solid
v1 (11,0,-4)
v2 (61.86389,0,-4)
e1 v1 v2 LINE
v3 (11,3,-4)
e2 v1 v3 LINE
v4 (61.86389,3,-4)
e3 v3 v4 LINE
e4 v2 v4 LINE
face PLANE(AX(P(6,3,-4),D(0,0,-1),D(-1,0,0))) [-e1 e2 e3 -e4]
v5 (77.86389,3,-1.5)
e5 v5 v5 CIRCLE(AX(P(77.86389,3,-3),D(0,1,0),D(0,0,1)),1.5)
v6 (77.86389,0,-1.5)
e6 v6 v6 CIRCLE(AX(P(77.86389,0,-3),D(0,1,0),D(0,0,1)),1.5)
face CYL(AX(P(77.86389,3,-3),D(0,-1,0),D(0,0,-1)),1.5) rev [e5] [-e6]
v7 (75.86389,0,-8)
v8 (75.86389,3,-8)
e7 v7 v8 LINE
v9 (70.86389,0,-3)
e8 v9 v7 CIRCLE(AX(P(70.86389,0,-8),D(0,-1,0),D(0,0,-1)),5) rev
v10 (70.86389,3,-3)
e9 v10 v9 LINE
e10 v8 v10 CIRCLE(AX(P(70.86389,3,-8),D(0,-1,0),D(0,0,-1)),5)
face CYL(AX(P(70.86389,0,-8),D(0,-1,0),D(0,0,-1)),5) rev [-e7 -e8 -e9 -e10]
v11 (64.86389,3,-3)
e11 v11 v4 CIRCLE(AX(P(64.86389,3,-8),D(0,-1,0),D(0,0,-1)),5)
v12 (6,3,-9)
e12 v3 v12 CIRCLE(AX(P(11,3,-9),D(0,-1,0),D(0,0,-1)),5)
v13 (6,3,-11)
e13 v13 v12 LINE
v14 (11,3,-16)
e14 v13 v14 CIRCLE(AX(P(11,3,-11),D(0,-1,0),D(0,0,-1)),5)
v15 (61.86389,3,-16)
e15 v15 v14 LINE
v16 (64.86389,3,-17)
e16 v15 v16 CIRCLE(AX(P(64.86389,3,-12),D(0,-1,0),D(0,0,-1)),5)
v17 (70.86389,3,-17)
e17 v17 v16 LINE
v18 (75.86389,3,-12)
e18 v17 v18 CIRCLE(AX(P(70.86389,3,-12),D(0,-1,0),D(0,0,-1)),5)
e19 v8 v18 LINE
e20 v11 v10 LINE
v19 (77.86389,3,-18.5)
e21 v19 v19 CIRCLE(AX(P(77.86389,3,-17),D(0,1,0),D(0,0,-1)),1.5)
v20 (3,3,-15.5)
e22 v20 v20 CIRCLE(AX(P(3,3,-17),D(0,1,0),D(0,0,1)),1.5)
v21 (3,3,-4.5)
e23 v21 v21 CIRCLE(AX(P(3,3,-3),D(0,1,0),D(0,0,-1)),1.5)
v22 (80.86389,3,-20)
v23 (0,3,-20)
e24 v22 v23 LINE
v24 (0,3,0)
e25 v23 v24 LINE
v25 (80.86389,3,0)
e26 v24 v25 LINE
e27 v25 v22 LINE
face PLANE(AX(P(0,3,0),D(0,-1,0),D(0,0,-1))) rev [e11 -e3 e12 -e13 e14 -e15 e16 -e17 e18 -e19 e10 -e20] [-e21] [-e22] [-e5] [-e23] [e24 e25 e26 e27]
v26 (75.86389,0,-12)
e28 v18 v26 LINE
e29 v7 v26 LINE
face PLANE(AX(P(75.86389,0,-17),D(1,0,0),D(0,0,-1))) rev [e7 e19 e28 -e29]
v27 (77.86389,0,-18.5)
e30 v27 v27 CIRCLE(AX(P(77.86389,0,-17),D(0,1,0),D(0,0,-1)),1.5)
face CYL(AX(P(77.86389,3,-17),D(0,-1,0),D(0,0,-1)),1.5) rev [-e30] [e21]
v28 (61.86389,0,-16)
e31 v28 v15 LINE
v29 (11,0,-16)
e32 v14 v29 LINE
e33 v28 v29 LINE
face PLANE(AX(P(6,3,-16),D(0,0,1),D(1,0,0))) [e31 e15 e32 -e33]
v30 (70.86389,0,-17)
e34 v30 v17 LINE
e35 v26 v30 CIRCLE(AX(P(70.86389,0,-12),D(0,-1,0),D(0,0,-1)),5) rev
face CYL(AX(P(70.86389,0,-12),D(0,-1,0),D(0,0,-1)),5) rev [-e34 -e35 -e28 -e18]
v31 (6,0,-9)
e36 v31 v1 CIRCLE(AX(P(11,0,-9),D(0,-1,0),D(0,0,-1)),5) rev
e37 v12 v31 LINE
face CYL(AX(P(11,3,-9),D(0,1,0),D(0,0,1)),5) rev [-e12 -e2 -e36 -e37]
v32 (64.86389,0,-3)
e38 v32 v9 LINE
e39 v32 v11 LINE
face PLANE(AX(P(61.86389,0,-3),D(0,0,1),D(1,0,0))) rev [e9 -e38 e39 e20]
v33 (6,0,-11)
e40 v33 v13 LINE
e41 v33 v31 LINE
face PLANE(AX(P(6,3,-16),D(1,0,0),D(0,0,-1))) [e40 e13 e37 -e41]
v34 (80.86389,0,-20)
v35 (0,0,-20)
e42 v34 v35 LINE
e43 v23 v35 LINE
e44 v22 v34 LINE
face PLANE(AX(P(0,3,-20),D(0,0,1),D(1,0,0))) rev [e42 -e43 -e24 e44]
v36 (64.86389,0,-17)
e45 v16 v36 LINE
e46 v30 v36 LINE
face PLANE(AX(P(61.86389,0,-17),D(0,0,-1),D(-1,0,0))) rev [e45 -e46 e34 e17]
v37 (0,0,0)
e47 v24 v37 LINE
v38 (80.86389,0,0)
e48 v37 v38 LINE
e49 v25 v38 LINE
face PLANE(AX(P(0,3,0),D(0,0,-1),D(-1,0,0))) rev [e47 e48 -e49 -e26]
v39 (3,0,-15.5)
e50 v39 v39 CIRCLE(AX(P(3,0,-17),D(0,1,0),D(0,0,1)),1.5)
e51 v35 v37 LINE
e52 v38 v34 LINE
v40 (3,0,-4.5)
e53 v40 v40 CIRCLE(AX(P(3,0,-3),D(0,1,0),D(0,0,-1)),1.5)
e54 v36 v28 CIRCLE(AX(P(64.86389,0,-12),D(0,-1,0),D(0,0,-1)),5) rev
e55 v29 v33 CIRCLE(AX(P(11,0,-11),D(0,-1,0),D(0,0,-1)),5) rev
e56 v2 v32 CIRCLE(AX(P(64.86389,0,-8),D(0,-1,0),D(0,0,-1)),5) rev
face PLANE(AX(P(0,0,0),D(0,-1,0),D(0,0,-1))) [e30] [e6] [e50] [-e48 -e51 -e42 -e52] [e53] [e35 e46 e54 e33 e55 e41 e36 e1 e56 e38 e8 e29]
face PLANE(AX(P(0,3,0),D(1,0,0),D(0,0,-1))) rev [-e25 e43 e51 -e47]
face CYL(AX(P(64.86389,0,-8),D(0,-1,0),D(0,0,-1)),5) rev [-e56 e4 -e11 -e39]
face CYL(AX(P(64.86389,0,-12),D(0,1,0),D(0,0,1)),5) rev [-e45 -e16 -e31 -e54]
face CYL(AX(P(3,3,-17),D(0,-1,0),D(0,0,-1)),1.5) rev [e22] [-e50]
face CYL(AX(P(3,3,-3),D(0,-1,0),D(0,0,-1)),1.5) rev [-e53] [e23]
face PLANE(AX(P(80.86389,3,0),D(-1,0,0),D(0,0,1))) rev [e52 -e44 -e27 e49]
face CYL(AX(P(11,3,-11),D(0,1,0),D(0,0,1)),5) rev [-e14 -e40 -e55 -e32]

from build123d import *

# Parameters (mm, degrees)
SKETCH1_W           = 80.863890266
SKETCH1_H           = 20
SKETCH1_R           = 1.5
SKETCH1_W_2         = 68.863890266
SKETCH1_H_2         = 12
BOSS_EXTRUDE1_DEPTH = 3
CUT_EXTRUDE1_DEPTH  = 84.354476478
FILLET1_R           = 5


with BuildPart() as part:
    # Sketch1 → Boss-Extrude1 (new body)
    with BuildSketch(Plane(origin=(0, 0, 0), x_dir=(1, 0, 0), z_dir=(0, 1, 0))):
        with Locations((40.431945133, 10)):
            Rectangle(SKETCH1_W, SKETCH1_H)
        with Locations(Location((3, 17, 0), (0, 0, 270))):
            Circle(SKETCH1_R, mode=Mode.SUBTRACT)
        with Locations(Location((3, 3, 0), (0, 0, 90))):
            Circle(SKETCH1_R, mode=Mode.SUBTRACT)
        with Locations(Location((77.863890266, 3, 0), (0, 0, 270))):
            Circle(SKETCH1_R, mode=Mode.SUBTRACT)
        with Locations(Location((77.863890266, 17, 0), (0, 0, 90))):
            Circle(SKETCH1_R, mode=Mode.SUBTRACT)
        with Locations((40.431945133, 10)):
            Rectangle(SKETCH1_W_2, SKETCH1_H_2, mode=Mode.SUBTRACT)
    extrude(amount=BOSS_EXTRUDE1_DEPTH)

    # Sketch2 → Cut-Extrude1 (cut, through all)
    with BuildSketch(Plane(origin=(0, 3, 0), x_dir=(1, 0, 0), z_dir=(0, 1, 0))):
        Polygon((61.863890266, 17), (61.863890266, 16), (74.863890266, 16), (74.863890266, 4), (61.863890266, 4), (61.863890266, 3), (75.863890266, 3), (75.863890266, 17), align=None)
    extrude(amount=-CUT_EXTRUDE1_DEPTH, mode=Mode.SUBTRACT)

    # Fillet1
    # the kernel refuses this fillet: 5 mm, written as the material it adds along each edge
    with BuildSketch(Plane(origin=(75.863890266, 3, -17), x_dir=(0, 0, 1), z_dir=(0, -1, 0)), Plane(origin=(75.863890266, 3, -3), x_dir=(-1, 0, 0), z_dir=(0, -1, 0)), Plane(origin=(6, 0, -16), x_dir=(0, 0, 1), z_dir=(0, 1, 0))) as fillet1_piece_1:
        with BuildLine():
            CenterArc((FILLET1_R, FILLET1_R), FILLET1_R, 180, 90)
            Line((0, FILLET1_R), (-FILLET1_R * 0.02, FILLET1_R))
            Line((-FILLET1_R * 0.02, FILLET1_R), (-FILLET1_R * 0.02, -FILLET1_R * 0.02))
            Line((-FILLET1_R * 0.02, -FILLET1_R * 0.02), (FILLET1_R, -FILLET1_R * 0.02))
            Line((FILLET1_R, -FILLET1_R * 0.02), (FILLET1_R, 0))
        make_face()
    extrude(amount=3)
    with BuildSketch(Plane(origin=(61.863890266, 3, -17), x_dir=(1, 0, 0), z_dir=(0, -1, 0))) as fillet1_piece_2:
        with BuildLine():
            CenterArc((3, 5), FILLET1_R, 233.130102354, 36.869897646)
            Line((0, 1), (-0.06, 0.92))
            ThreePointArc((-0.06, 0.92), (-0.1, 0.5), (-0.1, 0))
            Line((-0.1, 0), (0, -0.1))
            Line((0, -0.1), (3, -0.1))
            Line((3, -0.1), (3, 0))
        make_face()
    extrude(amount=3)
    with BuildSketch(Plane(origin=(61.863890266, 3, -3), x_dir=(0, 0, -1), z_dir=(0, -1, 0))) as fillet1_piece_3:
        with BuildLine():
            CenterArc((5, 3), FILLET1_R, 180, 36.869897646)
            Line((0, 3), (-0.1, 3))
            Line((-0.1, 3), (-0.1, 0))
            Line((-0.1, 0), (0, -0.1))
            ThreePointArc((0, -0.1), (0.5, -0.1), (0.92, -0.06))
            Line((0.92, -0.06), (1, 0))
        make_face()
    extrude(amount=3)
    with BuildSketch(Plane(origin=(6, 0, -4), x_dir=(0, 0, -1), z_dir=(0, 1, 0))) as fillet1_piece_4:
        with BuildLine():
            CenterArc((FILLET1_R, -FILLET1_R), FILLET1_R, 90, 90)
            Line((0, -FILLET1_R), (-FILLET1_R * 0.02, -FILLET1_R))
            Line((-FILLET1_R * 0.02, -FILLET1_R), (-FILLET1_R * 0.02, FILLET1_R * 0.02))
            Line((-FILLET1_R * 0.02, FILLET1_R * 0.02), (FILLET1_R, FILLET1_R * 0.02))
            Line((FILLET1_R, FILLET1_R * 0.02), (FILLET1_R, 0))
        make_face()
    extrude(amount=3)


solid = part.part
